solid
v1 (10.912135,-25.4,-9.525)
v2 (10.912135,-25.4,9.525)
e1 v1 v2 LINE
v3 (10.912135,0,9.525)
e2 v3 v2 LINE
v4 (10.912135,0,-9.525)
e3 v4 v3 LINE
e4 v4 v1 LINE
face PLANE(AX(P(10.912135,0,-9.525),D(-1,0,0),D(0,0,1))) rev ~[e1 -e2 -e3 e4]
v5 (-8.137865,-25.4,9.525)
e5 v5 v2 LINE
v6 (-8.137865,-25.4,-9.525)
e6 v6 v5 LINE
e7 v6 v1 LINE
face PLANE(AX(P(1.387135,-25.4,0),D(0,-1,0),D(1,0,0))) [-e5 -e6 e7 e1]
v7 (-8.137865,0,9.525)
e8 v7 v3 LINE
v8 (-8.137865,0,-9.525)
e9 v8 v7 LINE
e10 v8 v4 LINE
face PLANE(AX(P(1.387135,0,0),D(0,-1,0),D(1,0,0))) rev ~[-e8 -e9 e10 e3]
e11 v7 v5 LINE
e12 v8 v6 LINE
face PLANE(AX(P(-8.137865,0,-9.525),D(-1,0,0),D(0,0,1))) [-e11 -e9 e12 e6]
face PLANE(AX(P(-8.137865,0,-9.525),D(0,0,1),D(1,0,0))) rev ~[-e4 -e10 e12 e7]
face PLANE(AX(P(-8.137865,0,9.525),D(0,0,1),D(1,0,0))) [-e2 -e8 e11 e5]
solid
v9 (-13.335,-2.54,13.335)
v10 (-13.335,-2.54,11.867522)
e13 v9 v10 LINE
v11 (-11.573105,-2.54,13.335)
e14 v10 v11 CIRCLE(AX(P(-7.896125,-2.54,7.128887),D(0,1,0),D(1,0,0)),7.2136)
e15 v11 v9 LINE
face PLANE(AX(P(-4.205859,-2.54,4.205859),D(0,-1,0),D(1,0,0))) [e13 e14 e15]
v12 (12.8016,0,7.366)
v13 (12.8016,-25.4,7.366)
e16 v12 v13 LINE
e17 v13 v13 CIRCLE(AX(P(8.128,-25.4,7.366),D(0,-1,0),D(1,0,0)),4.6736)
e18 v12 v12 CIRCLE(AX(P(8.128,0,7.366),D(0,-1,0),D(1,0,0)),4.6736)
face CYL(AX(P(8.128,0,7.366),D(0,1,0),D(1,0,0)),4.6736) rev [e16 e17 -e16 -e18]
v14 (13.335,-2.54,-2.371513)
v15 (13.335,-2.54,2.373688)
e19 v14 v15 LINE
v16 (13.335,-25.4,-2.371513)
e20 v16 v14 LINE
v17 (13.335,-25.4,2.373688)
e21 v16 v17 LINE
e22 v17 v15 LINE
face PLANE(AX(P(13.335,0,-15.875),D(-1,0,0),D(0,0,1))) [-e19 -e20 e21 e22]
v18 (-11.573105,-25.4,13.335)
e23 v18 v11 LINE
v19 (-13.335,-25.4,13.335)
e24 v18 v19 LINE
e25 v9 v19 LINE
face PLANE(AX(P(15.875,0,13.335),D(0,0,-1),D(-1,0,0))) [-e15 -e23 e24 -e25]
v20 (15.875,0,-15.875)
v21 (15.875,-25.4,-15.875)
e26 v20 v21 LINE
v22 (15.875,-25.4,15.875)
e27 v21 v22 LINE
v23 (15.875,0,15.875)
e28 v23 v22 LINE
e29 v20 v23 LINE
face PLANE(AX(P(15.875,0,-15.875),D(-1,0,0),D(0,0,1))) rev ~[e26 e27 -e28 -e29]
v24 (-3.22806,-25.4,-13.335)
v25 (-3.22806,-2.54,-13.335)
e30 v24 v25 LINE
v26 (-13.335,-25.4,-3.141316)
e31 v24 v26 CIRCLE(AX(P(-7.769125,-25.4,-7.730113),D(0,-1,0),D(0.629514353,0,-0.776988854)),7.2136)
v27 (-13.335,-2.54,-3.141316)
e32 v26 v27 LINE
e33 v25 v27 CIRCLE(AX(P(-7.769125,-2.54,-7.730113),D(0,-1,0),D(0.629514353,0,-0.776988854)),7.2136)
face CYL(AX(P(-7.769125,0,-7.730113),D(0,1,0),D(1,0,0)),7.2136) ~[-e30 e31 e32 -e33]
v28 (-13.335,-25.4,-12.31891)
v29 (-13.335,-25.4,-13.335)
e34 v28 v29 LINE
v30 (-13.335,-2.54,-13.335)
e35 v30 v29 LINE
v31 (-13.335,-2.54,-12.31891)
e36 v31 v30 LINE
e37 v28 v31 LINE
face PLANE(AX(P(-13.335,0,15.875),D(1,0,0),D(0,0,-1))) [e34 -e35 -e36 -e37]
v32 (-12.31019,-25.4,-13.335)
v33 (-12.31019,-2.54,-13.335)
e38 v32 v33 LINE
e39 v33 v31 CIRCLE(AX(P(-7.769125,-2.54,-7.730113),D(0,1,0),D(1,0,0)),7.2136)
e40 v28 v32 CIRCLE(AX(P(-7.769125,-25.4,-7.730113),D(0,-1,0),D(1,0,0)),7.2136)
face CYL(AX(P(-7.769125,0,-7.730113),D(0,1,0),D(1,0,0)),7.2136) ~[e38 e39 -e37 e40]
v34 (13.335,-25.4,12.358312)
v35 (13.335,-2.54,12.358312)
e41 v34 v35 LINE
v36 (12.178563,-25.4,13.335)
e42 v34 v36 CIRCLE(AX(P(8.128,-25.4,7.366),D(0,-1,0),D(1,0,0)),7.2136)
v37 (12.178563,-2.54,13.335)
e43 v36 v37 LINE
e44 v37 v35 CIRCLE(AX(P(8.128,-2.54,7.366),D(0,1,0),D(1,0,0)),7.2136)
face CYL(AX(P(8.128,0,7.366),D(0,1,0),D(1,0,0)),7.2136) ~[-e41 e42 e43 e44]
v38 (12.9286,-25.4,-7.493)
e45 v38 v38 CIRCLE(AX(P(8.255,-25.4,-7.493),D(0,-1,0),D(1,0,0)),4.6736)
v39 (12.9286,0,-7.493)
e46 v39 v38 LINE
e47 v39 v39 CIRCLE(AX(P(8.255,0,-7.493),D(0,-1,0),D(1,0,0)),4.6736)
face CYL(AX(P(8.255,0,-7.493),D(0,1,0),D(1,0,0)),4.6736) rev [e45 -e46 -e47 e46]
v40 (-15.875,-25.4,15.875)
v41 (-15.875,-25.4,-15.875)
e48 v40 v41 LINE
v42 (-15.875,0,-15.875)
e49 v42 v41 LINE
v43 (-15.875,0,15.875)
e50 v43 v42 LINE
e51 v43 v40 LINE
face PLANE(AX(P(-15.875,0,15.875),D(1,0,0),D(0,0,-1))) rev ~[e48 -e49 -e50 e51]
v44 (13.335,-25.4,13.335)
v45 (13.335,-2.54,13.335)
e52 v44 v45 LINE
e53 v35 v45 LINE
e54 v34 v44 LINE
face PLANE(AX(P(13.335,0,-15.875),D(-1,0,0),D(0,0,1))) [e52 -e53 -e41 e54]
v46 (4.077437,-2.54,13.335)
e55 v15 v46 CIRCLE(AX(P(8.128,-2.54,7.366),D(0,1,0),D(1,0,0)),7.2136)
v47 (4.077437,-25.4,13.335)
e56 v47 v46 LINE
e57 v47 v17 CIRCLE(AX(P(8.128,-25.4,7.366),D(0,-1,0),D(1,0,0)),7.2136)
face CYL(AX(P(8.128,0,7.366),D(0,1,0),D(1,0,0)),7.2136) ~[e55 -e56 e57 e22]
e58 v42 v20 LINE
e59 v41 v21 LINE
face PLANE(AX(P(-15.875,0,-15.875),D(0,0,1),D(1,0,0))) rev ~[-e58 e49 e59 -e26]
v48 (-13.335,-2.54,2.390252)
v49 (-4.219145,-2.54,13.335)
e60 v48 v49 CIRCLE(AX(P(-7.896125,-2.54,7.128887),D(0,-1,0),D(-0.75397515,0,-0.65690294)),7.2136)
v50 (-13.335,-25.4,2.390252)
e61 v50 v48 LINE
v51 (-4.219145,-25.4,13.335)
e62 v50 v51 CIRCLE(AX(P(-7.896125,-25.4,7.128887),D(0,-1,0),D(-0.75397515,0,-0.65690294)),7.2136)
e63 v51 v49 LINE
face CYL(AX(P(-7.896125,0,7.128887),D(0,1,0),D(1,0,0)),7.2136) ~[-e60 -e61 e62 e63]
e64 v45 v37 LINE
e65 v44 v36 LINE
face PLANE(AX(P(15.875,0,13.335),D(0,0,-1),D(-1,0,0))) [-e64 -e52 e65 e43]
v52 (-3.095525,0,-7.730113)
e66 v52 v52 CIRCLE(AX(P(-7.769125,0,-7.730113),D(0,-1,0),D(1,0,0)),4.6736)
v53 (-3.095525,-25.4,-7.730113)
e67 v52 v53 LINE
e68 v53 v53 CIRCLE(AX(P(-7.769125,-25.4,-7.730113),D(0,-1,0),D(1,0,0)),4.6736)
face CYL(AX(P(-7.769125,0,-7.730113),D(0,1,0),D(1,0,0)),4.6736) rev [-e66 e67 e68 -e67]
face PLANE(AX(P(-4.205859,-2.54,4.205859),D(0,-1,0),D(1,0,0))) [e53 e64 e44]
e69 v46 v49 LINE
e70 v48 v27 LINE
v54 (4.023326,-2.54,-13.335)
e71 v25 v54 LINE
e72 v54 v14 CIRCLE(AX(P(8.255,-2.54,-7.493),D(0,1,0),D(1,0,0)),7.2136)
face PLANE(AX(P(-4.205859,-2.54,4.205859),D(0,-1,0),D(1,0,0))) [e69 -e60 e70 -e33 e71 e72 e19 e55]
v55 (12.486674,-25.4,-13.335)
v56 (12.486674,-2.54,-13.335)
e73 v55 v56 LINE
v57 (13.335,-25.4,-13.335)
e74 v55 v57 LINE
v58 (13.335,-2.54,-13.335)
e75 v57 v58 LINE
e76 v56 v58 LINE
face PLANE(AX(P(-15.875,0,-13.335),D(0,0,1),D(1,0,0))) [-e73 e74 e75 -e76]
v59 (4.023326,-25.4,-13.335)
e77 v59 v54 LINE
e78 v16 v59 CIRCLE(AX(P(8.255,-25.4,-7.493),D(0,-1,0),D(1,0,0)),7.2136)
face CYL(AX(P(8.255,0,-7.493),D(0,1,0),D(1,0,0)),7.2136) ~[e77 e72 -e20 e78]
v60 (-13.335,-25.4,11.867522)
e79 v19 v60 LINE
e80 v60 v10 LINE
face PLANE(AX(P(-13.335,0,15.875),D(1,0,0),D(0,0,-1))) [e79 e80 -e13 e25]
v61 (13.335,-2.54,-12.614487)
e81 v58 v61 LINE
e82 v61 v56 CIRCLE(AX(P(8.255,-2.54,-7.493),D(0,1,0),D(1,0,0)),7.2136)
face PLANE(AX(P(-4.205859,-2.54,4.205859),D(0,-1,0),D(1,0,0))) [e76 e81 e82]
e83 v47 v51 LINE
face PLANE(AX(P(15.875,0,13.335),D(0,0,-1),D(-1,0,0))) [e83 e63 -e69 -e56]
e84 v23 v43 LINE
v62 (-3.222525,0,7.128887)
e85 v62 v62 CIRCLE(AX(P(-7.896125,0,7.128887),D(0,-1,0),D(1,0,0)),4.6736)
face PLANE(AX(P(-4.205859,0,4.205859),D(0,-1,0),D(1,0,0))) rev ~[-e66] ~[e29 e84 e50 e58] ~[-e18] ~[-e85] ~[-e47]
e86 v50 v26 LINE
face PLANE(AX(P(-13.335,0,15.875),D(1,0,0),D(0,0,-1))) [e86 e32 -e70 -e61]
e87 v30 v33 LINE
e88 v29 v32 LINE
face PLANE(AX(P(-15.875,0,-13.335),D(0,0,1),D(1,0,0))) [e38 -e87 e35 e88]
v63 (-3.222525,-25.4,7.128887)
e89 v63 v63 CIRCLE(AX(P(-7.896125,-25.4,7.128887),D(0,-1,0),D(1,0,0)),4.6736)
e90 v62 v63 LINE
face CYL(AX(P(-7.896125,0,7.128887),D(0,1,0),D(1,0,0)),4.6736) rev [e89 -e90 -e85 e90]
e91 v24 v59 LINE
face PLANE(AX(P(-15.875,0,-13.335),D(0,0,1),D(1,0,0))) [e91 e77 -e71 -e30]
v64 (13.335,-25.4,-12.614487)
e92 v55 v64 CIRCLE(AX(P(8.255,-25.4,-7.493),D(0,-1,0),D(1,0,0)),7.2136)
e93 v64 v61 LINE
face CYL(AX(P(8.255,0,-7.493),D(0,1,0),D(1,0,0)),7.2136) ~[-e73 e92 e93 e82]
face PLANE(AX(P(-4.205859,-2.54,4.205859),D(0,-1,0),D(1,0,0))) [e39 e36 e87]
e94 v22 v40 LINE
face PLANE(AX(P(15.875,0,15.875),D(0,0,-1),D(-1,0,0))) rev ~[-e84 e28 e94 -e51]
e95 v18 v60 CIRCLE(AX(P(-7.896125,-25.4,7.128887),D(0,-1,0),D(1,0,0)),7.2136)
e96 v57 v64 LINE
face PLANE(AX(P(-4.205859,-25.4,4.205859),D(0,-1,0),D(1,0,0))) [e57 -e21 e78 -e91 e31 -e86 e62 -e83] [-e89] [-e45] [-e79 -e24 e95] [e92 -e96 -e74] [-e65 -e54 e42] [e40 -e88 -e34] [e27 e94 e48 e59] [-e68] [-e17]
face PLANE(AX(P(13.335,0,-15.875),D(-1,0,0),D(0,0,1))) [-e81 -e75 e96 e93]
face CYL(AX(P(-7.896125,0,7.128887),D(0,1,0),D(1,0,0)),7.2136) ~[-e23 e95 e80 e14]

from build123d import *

# Parameters (mm, degrees)
F1_R     = 4.6736
F1_W     = 31.623
F1_H     = 16.891
F2_DEPTH = 25.4
F3_T     = -2.54
F0_W     = 19.05
F0_H     = 19.05
F5_DEPTH = 25.4


# Not quite as in the source:
# - the program builds the solid bodies; features that only make, move or delete a surface that nothing else refers to are left out


with BuildPart() as f2:
    # F1 (on Front) → F2 (new body)
    with BuildSketch(Plane.XZ):
        Polygon((15.875, 1.016), (15.875, 15.875), (-15.875, 15.875), (-15.875, -15.875), (-15.748, -15.875), (-15.748, 1.016), align=None)
        with Locations((-7.8961248569, 7.1288868002)):
            Circle(F1_R, mode=Mode.SUBTRACT)
        with Locations((8.128, 7.366)):
            Circle(F1_R, mode=Mode.SUBTRACT)
        with Locations((0.0635, -7.4295)):
            Rectangle(F1_W, F1_H)
        with Locations((-7.7691248569, -7.7301131998)):
            Circle(F1_R, mode=Mode.SUBTRACT)
        with Locations((8.255, -7.493)):
            Circle(F1_R, mode=Mode.SUBTRACT)
    extrude(amount=F2_DEPTH)

    # F3
    f3_openings = [f2.faces().sort_by_distance(p)[0] for p in [
        (-0.06714, -25.4, 0.068119),
    ]]
    offset(amount=F3_T, openings=f3_openings)


with BuildPart() as f5:
    # F0 (on Front) → F5 (new body)
    with BuildSketch(Plane.XZ):
        with Locations((1.3871352458, 0)):
            Rectangle(F0_W, F0_H)
    extrude(amount=F5_DEPTH)


solid = Compound([f2.part, f5.part])
